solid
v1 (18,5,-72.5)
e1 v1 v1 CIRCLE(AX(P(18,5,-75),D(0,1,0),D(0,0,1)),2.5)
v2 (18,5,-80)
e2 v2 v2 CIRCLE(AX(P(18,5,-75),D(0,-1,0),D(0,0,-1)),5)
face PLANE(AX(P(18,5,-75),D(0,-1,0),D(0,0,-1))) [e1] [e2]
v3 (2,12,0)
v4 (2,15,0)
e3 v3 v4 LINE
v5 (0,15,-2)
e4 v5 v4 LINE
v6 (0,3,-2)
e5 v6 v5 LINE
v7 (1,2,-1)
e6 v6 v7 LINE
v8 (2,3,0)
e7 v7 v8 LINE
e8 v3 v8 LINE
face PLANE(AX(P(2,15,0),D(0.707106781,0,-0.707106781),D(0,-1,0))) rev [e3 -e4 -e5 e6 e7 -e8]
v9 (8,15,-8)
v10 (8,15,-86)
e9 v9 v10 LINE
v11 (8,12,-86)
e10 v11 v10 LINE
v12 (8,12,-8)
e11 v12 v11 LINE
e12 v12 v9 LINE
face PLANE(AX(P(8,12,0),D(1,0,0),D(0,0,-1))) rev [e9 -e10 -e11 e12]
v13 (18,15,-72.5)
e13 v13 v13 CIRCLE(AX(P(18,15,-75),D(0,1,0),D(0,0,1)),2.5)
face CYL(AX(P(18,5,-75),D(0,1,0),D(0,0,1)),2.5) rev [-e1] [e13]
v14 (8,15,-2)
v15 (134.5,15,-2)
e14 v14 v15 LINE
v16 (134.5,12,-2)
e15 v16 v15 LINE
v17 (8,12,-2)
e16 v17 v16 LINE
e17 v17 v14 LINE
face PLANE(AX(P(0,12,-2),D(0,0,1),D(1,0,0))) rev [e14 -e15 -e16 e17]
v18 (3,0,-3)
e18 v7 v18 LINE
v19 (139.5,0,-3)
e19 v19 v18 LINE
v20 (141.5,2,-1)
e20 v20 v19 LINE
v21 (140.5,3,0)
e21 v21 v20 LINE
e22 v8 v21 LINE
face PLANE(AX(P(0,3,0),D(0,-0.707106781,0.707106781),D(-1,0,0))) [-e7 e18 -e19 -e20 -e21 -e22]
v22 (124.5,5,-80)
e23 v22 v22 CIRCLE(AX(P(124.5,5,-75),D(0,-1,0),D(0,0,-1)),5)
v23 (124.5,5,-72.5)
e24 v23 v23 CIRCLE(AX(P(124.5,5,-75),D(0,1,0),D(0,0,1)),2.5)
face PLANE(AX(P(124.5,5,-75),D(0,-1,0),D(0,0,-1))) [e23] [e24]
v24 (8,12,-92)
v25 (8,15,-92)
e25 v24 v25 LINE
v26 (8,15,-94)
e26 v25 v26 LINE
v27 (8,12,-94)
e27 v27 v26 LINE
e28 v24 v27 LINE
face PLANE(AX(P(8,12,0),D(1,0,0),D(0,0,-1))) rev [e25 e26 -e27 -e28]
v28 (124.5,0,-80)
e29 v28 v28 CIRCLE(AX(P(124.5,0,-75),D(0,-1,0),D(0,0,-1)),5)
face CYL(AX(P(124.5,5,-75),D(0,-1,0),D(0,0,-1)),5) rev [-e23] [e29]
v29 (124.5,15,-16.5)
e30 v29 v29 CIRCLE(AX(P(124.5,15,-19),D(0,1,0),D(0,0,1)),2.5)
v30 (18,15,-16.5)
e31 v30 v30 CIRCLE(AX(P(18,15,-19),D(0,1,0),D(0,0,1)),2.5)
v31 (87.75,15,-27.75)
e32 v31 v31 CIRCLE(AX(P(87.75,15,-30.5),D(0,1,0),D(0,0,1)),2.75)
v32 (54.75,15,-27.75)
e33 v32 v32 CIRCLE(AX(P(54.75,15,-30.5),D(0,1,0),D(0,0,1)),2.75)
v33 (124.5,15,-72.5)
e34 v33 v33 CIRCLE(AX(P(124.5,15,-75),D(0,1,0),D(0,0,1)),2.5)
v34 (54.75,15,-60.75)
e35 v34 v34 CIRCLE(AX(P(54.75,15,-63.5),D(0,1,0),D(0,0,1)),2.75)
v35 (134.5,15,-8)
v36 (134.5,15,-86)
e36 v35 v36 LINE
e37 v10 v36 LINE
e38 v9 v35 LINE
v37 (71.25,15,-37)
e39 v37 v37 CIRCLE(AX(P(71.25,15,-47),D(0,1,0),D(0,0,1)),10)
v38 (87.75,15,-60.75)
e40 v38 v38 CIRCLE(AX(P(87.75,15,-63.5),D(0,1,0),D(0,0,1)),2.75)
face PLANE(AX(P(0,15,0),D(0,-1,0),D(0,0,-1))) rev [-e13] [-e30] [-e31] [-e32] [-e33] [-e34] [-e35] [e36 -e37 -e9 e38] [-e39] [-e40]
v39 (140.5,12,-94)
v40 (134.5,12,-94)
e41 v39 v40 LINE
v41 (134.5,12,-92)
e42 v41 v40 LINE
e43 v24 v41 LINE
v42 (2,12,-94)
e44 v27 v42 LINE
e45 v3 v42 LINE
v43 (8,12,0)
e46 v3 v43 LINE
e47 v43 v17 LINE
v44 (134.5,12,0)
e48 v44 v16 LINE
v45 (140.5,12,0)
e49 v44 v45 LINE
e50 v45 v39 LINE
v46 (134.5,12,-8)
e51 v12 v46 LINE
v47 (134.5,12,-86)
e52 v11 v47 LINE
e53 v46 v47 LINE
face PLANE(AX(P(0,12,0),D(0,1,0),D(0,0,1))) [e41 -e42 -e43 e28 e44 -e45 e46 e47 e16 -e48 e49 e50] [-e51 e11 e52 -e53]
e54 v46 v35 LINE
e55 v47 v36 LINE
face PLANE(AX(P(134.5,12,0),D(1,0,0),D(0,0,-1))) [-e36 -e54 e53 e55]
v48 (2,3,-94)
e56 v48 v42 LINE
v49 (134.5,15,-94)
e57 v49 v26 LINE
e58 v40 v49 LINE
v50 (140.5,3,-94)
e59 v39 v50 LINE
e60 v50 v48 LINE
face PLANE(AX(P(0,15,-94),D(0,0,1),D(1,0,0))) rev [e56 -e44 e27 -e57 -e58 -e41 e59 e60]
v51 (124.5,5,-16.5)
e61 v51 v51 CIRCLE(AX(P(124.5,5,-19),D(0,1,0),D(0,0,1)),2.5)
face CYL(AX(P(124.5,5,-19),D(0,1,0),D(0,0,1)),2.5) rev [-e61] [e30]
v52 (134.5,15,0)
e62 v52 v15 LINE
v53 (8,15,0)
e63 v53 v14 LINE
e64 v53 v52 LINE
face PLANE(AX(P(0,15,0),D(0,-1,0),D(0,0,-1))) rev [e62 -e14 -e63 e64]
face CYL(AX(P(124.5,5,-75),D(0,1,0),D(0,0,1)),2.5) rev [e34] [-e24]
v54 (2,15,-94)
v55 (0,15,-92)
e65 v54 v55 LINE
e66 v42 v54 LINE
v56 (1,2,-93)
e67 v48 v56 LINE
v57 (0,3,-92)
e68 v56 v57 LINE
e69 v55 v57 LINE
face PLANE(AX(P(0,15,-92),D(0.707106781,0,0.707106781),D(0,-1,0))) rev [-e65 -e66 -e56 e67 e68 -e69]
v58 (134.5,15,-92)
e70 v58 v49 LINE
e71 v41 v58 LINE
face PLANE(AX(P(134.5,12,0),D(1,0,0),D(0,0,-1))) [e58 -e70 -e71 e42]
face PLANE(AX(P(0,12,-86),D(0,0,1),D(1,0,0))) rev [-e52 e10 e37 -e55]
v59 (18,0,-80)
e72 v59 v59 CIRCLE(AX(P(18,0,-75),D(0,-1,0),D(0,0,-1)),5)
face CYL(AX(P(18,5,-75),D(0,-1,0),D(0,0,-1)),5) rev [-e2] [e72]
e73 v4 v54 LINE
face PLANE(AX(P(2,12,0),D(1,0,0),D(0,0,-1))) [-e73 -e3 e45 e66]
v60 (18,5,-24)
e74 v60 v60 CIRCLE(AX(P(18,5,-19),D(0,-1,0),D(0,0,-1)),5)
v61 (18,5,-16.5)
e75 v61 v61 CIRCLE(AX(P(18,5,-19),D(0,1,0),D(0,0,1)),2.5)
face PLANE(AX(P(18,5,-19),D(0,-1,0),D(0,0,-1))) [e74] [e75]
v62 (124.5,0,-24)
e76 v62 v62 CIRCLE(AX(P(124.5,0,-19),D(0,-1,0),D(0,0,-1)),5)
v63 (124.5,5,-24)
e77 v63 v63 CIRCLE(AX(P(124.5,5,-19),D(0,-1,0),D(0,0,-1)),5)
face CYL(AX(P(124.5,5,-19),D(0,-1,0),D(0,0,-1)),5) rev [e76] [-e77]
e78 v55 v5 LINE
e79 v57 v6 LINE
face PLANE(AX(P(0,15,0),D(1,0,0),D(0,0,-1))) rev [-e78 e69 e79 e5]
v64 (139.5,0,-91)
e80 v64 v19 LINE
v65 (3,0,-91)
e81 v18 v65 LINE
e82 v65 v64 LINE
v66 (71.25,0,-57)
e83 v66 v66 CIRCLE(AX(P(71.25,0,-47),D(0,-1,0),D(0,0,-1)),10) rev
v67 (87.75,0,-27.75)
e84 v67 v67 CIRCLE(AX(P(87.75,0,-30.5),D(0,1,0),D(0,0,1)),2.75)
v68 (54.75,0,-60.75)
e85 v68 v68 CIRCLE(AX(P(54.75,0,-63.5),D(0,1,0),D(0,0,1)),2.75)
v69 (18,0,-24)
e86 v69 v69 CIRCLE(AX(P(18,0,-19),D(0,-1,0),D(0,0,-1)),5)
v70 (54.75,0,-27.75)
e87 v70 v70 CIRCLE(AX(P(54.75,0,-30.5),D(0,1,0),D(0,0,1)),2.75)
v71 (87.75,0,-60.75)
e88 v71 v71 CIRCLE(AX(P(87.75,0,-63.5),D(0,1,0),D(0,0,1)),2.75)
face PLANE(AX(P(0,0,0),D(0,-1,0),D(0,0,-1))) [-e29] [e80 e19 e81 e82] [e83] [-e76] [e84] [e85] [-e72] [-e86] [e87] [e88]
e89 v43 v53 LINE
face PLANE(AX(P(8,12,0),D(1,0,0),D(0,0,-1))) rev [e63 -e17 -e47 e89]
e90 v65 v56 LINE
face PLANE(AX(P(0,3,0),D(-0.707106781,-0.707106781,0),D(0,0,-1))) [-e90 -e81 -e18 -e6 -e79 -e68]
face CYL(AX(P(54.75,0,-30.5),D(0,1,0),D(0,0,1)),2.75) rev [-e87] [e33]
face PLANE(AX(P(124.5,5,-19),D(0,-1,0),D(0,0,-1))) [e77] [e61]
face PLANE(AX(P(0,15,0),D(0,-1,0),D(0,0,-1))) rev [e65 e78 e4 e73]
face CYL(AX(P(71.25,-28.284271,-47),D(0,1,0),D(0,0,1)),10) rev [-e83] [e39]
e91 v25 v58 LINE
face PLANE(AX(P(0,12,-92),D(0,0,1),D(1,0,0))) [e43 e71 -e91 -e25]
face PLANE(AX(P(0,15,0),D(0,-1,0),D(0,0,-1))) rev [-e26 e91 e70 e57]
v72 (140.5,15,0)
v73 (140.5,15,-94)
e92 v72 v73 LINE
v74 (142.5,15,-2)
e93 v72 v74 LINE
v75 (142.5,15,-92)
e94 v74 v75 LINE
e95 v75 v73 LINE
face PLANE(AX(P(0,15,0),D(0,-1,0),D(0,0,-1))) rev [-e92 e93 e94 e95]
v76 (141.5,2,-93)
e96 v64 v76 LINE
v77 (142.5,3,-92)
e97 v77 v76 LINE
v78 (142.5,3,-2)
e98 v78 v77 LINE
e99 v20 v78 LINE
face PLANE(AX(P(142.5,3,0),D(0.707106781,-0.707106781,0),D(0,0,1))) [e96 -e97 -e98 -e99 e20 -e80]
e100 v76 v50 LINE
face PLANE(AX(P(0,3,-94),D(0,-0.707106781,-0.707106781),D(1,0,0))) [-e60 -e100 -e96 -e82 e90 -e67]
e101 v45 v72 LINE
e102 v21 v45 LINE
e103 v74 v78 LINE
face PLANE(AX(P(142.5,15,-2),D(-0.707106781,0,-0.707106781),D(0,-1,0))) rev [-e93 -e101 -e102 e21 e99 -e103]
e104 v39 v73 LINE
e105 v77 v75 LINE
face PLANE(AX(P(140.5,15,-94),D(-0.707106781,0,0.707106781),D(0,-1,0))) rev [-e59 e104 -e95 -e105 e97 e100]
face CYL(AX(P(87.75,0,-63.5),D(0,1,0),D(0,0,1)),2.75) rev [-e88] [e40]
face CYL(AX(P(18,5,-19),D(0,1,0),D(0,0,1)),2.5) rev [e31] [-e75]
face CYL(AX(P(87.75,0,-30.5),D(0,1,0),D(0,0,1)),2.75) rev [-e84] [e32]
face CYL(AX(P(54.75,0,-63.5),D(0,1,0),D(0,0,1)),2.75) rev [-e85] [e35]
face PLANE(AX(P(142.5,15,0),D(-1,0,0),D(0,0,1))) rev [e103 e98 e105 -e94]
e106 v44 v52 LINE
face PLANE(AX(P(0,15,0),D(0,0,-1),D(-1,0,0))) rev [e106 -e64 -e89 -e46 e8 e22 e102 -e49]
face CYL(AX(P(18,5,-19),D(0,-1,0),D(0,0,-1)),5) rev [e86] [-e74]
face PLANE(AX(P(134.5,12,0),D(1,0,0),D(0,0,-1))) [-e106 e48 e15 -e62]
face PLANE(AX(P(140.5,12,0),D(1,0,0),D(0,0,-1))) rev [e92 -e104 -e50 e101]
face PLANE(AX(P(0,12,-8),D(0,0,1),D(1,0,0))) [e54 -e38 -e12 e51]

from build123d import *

# Parameters (mm, degrees)
SKETCH1_W           = 142.5
SKETCH1_H           = 94
BOSS_EXTRUDE1_DEPTH = 15
SKETCH2_W           = 126.5
SKETCH2_H           = 78
CUT_EXTRUDE2_DEPTH  = 3
CHAMFER1_SIZE       = 2
SKETCH6_R           = 2.5
CUT_EXTRUDE7_DEPTH  = 10
SKETCH7_R           = 5
CUT_EXTRUDE8_DEPTH  = 5
CHAMFER2_SIZE       = 3
SKETCH8_R           = 10
CUT_EXTRUDE9_DEPTH  = 15
CUT_EXTRUDE10_DEPTH = 172.368754445


# Some blends are built 0.0001 mm under size
with BuildPart() as part:
    # Sketch1 → Boss-Extrude1 (new body)
    with BuildSketch(Plane(origin=(0, 0, 0), x_dir=(1, 0, 0), z_dir=(0, 1, 0))):
        with Locations((71.25, 47)):
            Rectangle(SKETCH1_W, SKETCH1_H)
    extrude(amount=BOSS_EXTRUDE1_DEPTH)

    # Sketch2 → Cut-Extrude2 (cut)
    with BuildSketch(Plane(origin=(0, 15, 0), x_dir=(1, 0, 0), z_dir=(0, 1, 0))):
        Polygon((134.5, 92), (8, 92), (8, 94), (2, 94), (2, 0), (8, 0), (8, 2), (134.5, 2), (134.5, 0), (140.5, 0), (140.5, 94), (134.5, 94), align=None)
        with Locations((71.25, 47)):
            Rectangle(SKETCH2_W, SKETCH2_H, mode=Mode.SUBTRACT)
    extrude(amount=-CUT_EXTRUDE2_DEPTH, mode=Mode.SUBTRACT)

    # Chamfer1
    chamfer1_edges = [part.edges().sort_by_distance(p)[0] for p in [
        (0, 7.5, 0),
        (0, 7.5, -94),
        (142.5, 7.5, -94),
        (142.5, 7.5, 0),
    ]]
    chamfer(chamfer1_edges, length=CHAMFER1_SIZE - 0.0001)  # a hair under: the kernel refuses the full size

    # Sketch6 → Cut-Extrude7 (cut)
    with BuildSketch(Plane(origin=(0, 15, 0), x_dir=(1, 0, 0), z_dir=(0, 1, 0))):
        with Locations(Location((124.5, 75, 0), (0, 0, 270))):
            Circle(SKETCH6_R)
        with Locations(Location((18, 75, 0), (0, 0, 270))):
            Circle(SKETCH6_R)
        with Locations(Location((18, 19, 0), (0, 0, 270))):
            Circle(SKETCH6_R)
        with Locations(Location((124.5, 19, 0), (0, 0, 270))):
            Circle(SKETCH6_R)
    extrude(amount=-CUT_EXTRUDE7_DEPTH, mode=Mode.SUBTRACT)

    # Sketch7 → Cut-Extrude8 (cut)
    with BuildSketch(Plane.XZ):
        with Locations(Location((18, -19, 0), (0, 0, 270))):
            Circle(SKETCH7_R)
        with Locations(Location((124.5, -19, 0), (0, 0, 270))):
            Circle(SKETCH7_R)
        with Locations(Location((18, -75, 0), (0, 0, 270))):
            Circle(SKETCH7_R)
        with Locations(Location((124.5, -75, 0), (0, 0, 270))):
            Circle(SKETCH7_R)
    extrude(amount=-CUT_EXTRUDE8_DEPTH, mode=Mode.SUBTRACT)

    # Chamfer2
    # the kernel refuses this chamfer: 3 mm, written as the material it takes off along each edge
    with BuildSketch(Plane(origin=(142.5, 0, 5.715148964), x_dir=(-0.9996219169112968, -0.027495876610586487, 0), z_dir=(0, 0, -1)), Plane(origin=(0, 0, -99.715148964), x_dir=(0.9996219169112968, -0.027495876610586372, 0), z_dir=(0, 0, 1))) as chamfer2_piece_1:
        Polygon((CHAMFER2_SIZE * 0.999621916911, CHAMFER2_SIZE * 0.0274958766106), (-CHAMFER2_SIZE * 0.0274958766106, CHAMFER2_SIZE * 0.999621916911), (0, 0), align=None)
    extrude(amount=105.430297928, mode=Mode.SUBTRACT)
    with BuildSketch(Plane(origin=(-5.715148964, 0, 0), x_dir=(0, 0.9996219169112968, 0.027495876610586372), z_dir=(1, 0, 0))) as chamfer2_piece_2:
        Polygon((CHAMFER2_SIZE * 0.999621916911, -CHAMFER2_SIZE * 0.0274958766106), (-CHAMFER2_SIZE * 0.0274958766106, -CHAMFER2_SIZE * 0.999621916911), (0, 0), align=None)
    extrude(amount=153.930297928, mode=Mode.SUBTRACT)
    with BuildSketch(Plane(origin=(148.215148964, 0, -94), x_dir=(0, -0.02749587661058636, 0.9996219169112968), z_dir=(-1, 0, 0))) as chamfer2_piece_3:
        Polygon((CHAMFER2_SIZE * 0.999621916911, CHAMFER2_SIZE * 0.0274958766106), (-CHAMFER2_SIZE * 0.0274958766106, CHAMFER2_SIZE * 0.999621916911), (0, 0), align=None)
    extrude(amount=153.930297928, mode=Mode.SUBTRACT)

    # Sketch8 → Cut-Extrude9 (cut)
    with BuildSketch(Plane(origin=(0, 15, 0), x_dir=(1, 0, 0), z_dir=(0, 1, 0))):
        with Locations(Location((71.25, 47, 0), (0, 0, 270))):
            Circle(SKETCH8_R)
    extrude(amount=-CUT_EXTRUDE9_DEPTH, mode=Mode.SUBTRACT)

    # Sketch9 → Cut-Extrude10 (cut, through all)
    with BuildSketch(Plane(origin=(0, 15, 0), x_dir=(1, 0, 0), z_dir=(0, 1, 0))):
        with BuildLine():
            Line((54.75, 60.75), (54.75, 63.5))
            Line((54.75, 63.5), (57.5, 63.5))
            ThreePointArc((57.5, 63.5), (52.805456352, 65.444543648), (54.75, 60.75))
        make_face()
        with BuildLine():
            Line((57.5, 63.5), (54.75, 63.5))
            Line((54.75, 63.5), (54.75, 60.75))
            ThreePointArc((54.75, 60.75), (56.694543648, 61.555456352), (57.5, 63.5))
        make_face()
        with BuildLine():
            ThreePointArc((57.5, 30.5), (56.694543648, 32.444543648), (54.75, 33.25))
            Line((54.75, 33.25), (54.75, 30.5))
            Line((54.75, 30.5), (57.5, 30.5))
        make_face()
        with BuildLine():
            Line((54.75, 30.5), (54.75, 33.25))
            ThreePointArc((54.75, 33.25), (52.805456352, 28.555456352), (57.5, 30.5))
            Line((57.5, 30.5), (54.75, 30.5))
        make_face()
        with BuildLine():
            ThreePointArc((90.5, 30.5), (89.694543648, 32.444543648), (87.75, 33.25))
            Line((87.75, 33.25), (87.75, 30.5))
            Line((87.75, 30.5), (85, 30.5))
            ThreePointArc((85, 30.5), (87.75, 27.75), (90.5, 30.5))
        make_face()
        with BuildLine():
            Line((87.75, 30.5), (87.75, 33.25))
            ThreePointArc((87.75, 33.25), (85.805456352, 32.444543648), (85, 30.5))
            Line((85, 30.5), (87.75, 30.5))
        make_face()
        with BuildLine():
            ThreePointArc((90.5, 63.5), (87.75, 66.25), (85, 63.5))
            Line((85, 63.5), (87.75, 63.5))
            Line((87.75, 63.5), (87.75, 60.75))
            ThreePointArc((87.75, 60.75), (89.694543648, 61.555456352), (90.5, 63.5))
        make_face()
        with BuildLine():
            Line((87.75, 63.5), (85, 63.5))
            ThreePointArc((85, 63.5), (85.805456352, 61.555456352), (87.75, 60.75))
            Line((87.75, 60.75), (87.75, 63.5))
        make_face()
    extrude(amount=-CUT_EXTRUDE10_DEPTH, mode=Mode.SUBTRACT)


solid = part.part
